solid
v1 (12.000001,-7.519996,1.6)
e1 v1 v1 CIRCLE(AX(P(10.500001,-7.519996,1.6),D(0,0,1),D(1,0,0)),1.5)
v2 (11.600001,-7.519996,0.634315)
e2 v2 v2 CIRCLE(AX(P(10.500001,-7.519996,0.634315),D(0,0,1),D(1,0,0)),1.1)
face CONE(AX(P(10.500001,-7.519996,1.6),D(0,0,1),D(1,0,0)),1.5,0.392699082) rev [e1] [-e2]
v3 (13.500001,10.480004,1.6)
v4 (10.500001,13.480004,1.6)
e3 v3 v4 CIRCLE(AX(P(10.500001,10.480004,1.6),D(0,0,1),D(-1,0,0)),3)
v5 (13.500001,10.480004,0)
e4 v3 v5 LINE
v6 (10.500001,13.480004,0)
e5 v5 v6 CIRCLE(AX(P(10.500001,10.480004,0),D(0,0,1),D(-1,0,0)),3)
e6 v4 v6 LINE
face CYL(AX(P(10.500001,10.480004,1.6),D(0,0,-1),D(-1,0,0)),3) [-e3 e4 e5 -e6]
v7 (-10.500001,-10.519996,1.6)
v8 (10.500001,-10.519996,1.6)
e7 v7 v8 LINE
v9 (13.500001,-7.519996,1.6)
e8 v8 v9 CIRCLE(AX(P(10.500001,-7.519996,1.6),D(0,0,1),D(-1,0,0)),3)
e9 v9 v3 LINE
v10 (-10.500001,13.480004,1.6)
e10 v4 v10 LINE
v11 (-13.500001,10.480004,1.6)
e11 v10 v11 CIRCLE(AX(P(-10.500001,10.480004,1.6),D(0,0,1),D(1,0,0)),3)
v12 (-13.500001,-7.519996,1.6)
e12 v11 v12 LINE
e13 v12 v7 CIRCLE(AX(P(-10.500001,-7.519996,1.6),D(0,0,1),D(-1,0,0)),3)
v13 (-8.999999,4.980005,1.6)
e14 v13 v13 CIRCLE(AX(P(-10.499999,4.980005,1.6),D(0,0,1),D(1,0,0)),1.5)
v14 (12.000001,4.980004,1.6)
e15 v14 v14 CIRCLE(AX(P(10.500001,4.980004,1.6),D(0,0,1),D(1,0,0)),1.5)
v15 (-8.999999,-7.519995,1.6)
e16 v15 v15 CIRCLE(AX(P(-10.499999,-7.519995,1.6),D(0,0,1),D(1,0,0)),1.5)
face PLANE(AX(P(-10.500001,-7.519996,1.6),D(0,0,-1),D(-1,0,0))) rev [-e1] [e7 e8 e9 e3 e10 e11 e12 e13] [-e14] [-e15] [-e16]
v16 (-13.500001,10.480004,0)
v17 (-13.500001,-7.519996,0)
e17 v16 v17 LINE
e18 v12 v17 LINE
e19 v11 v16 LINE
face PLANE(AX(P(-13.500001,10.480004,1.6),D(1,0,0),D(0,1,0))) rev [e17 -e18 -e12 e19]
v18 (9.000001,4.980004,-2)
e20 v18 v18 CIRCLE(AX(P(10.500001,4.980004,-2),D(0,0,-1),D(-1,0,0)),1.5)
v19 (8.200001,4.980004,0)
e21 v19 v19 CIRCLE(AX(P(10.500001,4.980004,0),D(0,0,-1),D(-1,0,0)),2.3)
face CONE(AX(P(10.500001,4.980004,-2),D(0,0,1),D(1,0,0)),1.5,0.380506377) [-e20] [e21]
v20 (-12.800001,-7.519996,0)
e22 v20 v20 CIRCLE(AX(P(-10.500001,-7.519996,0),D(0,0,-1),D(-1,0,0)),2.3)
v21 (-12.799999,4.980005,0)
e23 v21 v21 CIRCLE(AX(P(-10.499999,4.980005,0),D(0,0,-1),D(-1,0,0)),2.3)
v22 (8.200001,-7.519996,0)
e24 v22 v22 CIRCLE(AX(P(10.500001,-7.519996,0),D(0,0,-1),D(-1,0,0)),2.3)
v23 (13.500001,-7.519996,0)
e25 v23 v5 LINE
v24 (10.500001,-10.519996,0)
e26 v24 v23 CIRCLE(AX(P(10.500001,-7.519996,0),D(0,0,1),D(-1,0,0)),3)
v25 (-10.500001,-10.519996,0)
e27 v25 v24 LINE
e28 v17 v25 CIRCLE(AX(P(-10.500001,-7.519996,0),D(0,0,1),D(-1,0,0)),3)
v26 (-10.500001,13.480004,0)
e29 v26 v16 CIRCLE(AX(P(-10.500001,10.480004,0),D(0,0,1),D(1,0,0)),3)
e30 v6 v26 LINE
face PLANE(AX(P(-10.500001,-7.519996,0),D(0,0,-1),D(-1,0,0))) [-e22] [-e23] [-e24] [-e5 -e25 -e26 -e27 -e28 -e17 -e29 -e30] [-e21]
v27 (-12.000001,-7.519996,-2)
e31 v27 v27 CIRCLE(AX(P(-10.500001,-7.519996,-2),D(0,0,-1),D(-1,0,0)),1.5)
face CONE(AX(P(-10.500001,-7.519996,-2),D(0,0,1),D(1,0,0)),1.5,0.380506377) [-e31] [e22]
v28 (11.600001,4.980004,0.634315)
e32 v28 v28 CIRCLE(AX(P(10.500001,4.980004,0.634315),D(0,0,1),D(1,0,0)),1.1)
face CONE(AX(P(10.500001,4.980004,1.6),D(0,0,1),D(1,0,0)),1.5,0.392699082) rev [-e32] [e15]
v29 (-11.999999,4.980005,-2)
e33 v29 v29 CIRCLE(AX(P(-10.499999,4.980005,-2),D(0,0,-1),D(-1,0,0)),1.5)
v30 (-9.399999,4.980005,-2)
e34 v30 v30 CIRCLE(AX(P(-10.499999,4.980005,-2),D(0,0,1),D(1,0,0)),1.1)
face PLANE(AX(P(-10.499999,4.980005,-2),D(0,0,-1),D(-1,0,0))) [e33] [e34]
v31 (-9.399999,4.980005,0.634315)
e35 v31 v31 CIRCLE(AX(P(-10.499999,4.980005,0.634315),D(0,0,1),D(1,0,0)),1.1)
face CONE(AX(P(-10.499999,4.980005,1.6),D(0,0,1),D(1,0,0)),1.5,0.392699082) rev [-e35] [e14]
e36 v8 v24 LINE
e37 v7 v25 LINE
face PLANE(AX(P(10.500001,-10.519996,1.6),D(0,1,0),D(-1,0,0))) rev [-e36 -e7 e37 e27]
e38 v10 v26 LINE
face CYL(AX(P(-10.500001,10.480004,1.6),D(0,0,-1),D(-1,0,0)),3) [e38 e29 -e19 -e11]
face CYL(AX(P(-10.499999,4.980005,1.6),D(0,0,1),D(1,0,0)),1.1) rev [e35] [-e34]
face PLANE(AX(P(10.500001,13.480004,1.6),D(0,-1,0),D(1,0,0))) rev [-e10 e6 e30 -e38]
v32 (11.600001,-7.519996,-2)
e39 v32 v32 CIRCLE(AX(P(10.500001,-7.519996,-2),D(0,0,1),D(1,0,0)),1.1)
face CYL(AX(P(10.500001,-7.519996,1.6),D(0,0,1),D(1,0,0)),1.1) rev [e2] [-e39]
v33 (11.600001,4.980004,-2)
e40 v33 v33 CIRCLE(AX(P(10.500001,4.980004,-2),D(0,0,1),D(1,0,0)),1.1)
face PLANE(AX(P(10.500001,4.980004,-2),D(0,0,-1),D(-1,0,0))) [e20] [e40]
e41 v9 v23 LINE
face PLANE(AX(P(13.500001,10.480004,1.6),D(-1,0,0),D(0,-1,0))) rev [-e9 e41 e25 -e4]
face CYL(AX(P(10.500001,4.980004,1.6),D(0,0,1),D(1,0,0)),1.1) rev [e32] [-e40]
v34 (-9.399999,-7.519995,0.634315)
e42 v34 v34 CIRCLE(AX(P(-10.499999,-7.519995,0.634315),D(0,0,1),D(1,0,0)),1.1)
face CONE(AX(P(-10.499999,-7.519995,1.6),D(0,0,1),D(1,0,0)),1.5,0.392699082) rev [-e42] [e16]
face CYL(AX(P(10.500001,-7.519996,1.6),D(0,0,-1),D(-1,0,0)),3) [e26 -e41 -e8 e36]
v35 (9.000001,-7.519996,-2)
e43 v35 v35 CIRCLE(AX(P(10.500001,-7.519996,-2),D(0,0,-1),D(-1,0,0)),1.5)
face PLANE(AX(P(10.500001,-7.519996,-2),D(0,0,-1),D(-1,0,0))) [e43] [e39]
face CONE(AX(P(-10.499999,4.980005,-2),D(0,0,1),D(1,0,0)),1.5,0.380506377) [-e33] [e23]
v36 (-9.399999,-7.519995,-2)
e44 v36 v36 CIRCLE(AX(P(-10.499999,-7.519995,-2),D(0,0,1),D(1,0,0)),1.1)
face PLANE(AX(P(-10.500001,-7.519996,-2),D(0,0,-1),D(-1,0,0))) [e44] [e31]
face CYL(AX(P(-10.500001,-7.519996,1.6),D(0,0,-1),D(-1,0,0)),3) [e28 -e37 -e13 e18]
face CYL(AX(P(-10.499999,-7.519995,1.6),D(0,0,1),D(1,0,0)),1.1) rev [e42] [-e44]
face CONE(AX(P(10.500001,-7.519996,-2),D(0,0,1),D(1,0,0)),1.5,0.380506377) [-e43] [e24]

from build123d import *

# Parameters (mm, degrees)
BOSS_EXTRUDE1_DEPTH           = 1.6
SKETCH4_R                     = 2.3
BOSS_EXTRUDE2_DEPTH           = 2
M2_CLEARANCE_HOLE1_AT_2_COUNT = 2
M2_CLEARANCE_HOLE1_AT_2_PITCH = 12.5
M2_CLEARANCE_HOLE1_AT_3_COUNT = 2
M2_CLEARANCE_HOLE1_AT_3_PITCH = 24.43869882
M2_CLEARANCE_HOLE1_AT_4_COUNT = 2
M2_CLEARANCE_HOLE1_AT_4_PITCH = 21
CHAMFER1_SIZE                 = 2
CHAMFER1_SIZE_2               = 0.8


with BuildPart() as part:
    # Sketch1 → Boss-Extrude1 (new body)
    with BuildSketch(Plane.XY):
        with BuildLine():
            Line((10.50000068, 13.480003898), (-10.50000068, 13.480003898))
            ThreePointArc((-10.50000068, 13.480003898), (-12.621321024, 12.601324241), (-13.50000068, 10.480003898))
            Line((-13.50000068, 10.480003898), (-13.50000068, -7.519996102))
            ThreePointArc((-13.50000068, -7.519996102), (-12.621321024, -9.641316446), (-10.50000068, -10.519996102))
            Line((-10.50000068, -10.519996102), (10.50000068, -10.519996102))
            ThreePointArc((10.50000068, -10.519996102), (12.621321024, -9.641316446), (13.50000068, -7.519996102))
            Line((13.50000068, -7.519996102), (13.50000068, 10.480003898))
            ThreePointArc((13.50000068, 10.480003898), (12.621321024, 12.601324241), (10.50000068, 13.480003898))
        make_face()
    extrude(amount=BOSS_EXTRUDE1_DEPTH)

    # Sketch4 → Boss-Extrude2 (add)
    with BuildSketch(Plane(origin=(0, 0, 0), x_dir=(-1, 0, 0), z_dir=(0, 0, -1))):
        with Locations((-10.500001265, 4.980003898)):
            Circle(SKETCH4_R)
        with Locations((10.499998735, 4.98000488)):
            Circle(SKETCH4_R)
        with Locations((10.50000068, -7.519996102)):
            Circle(SKETCH4_R)
        with Locations((-10.50000068, -7.519996102)):
            Circle(SKETCH4_R)
    extrude(amount=BOSS_EXTRUDE2_DEPTH)

    # Sketch3 → M2 Clearance Hole1 (revolve, cut)
    with BuildSketch(Plane(origin=(10.500001265, 4.980003898, 1.6), x_dir=(0, -1, 0), z_dir=(1, 0, 0))):
        Polygon((0, 0), (0, 3.6), (1.1, 3.6), (1.1, 0.965685425), (1.5, 0), align=None)
    m2_clearance_hole1 = revolve(axis=Axis((10.500001265, 4.980003898, 7.95), (0, 0, -1)), mode=Mode.SUBTRACT)

    # M2 Clearance Hole1 at 2: M2 Clearance Hole1 ×2
    with Locations(*[(0, -i * M2_CLEARANCE_HOLE1_AT_2_PITCH, 0) for i in range(1, M2_CLEARANCE_HOLE1_AT_2_COUNT)]):
        add(m2_clearance_hole1, mode=Mode.SUBTRACT)

    # M2 Clearance Hole1 at 3: M2 Clearance Hole1 ×2
    with Locations(*[Vector(-0.8592929083374752, -0.5114838195690296, 0) * (i * M2_CLEARANCE_HOLE1_AT_3_PITCH) for i in range(1, M2_CLEARANCE_HOLE1_AT_3_COUNT)]):
        add(m2_clearance_hole1, mode=Mode.SUBTRACT)

    # M2 Clearance Hole1 at 4: M2 Clearance Hole1 ×2
    with Locations(*[(-i * M2_CLEARANCE_HOLE1_AT_4_PITCH, 0, 0) for i in range(1, M2_CLEARANCE_HOLE1_AT_4_COUNT)]):
        add(m2_clearance_hole1, mode=Mode.SUBTRACT)

    # Chamfer1
    # the kernel refuses this chamfer: 2, 0.8 mm, written as the material it takes off along each edge
    with BuildSketch(Plane(origin=(10.500001265, 4.980003898, -2), x_dir=(-1, 0, 0), z_dir=(0, -1, 0))) as chamfer1_piece_1_section:
        Polygon((2.3, -CHAMFER1_SIZE), (2.3 - CHAMFER1_SIZE_2, 0), (2.3, 0), align=None)
    chamfer1_piece_1 = revolve(axis=Axis((10.500001265, 4.980003898, -2), (0, 0, -1)), mode=Mode.PRIVATE)
    chamfer1_piece_1 = split(chamfer1_piece_1, bisect_by=Plane(origin=(12.406400558, 4.980003898, 0), z_dir=(0, 0, -1)), keep=Keep.TOP, mode=Mode.PRIVATE)
    add(chamfer1_piece_1, mode=Mode.SUBTRACT)
    with BuildSketch(Plane(origin=(-10.499998735, 4.98000488, -2), x_dir=(-1, 0, 0), z_dir=(0, -1, 0))) as chamfer1_piece_2_section:
        Polygon((2.3, -CHAMFER1_SIZE), (2.3 - CHAMFER1_SIZE_2, 0), (2.3, 0), align=None)
    chamfer1_piece_2 = revolve(axis=Axis((-10.499998735, 4.98000488, -2), (0, 0, -1)), mode=Mode.PRIVATE)
    chamfer1_piece_2 = split(chamfer1_piece_2, bisect_by=Plane(origin=(-8.593599442, 4.98000488, 0), z_dir=(0, 0, -1)), keep=Keep.TOP, mode=Mode.PRIVATE)
    add(chamfer1_piece_2, mode=Mode.SUBTRACT)
    with BuildSketch(Plane(origin=(-10.50000068, -7.519996102, -2), x_dir=(-1, 0, 0), z_dir=(0, -1, 0))) as chamfer1_piece_3_section:
        Polygon((2.3, -CHAMFER1_SIZE), (2.3 - CHAMFER1_SIZE_2, 0), (2.3, 0), align=None)
    chamfer1_piece_3 = revolve(axis=Axis((-10.50000068, -7.519996102, -2), (0, 0, -1)), mode=Mode.PRIVATE)
    chamfer1_piece_3 = split(chamfer1_piece_3, bisect_by=Plane(origin=(-8.593601387, -7.519996102, 0), z_dir=(0, 0, -1)), keep=Keep.TOP, mode=Mode.PRIVATE)
    add(chamfer1_piece_3, mode=Mode.SUBTRACT)
    with BuildSketch(Plane(origin=(10.50000068, -7.519996102, -2), x_dir=(-1, 0, 0), z_dir=(0, -1, 0))) as chamfer1_piece_4_section:
        Polygon((2.3, -CHAMFER1_SIZE), (2.3 - CHAMFER1_SIZE_2, 0), (2.3, 0), align=None)
    chamfer1_piece_4 = revolve(axis=Axis((10.50000068, -7.519996102, -2), (0, 0, -1)), mode=Mode.PRIVATE)
    chamfer1_piece_4 = split(chamfer1_piece_4, bisect_by=Plane(origin=(12.406399973, -7.519996102, 0), z_dir=(0, 0, -1)), keep=Keep.TOP, mode=Mode.PRIVATE)
    add(chamfer1_piece_4, mode=Mode.SUBTRACT)


solid = part.part
